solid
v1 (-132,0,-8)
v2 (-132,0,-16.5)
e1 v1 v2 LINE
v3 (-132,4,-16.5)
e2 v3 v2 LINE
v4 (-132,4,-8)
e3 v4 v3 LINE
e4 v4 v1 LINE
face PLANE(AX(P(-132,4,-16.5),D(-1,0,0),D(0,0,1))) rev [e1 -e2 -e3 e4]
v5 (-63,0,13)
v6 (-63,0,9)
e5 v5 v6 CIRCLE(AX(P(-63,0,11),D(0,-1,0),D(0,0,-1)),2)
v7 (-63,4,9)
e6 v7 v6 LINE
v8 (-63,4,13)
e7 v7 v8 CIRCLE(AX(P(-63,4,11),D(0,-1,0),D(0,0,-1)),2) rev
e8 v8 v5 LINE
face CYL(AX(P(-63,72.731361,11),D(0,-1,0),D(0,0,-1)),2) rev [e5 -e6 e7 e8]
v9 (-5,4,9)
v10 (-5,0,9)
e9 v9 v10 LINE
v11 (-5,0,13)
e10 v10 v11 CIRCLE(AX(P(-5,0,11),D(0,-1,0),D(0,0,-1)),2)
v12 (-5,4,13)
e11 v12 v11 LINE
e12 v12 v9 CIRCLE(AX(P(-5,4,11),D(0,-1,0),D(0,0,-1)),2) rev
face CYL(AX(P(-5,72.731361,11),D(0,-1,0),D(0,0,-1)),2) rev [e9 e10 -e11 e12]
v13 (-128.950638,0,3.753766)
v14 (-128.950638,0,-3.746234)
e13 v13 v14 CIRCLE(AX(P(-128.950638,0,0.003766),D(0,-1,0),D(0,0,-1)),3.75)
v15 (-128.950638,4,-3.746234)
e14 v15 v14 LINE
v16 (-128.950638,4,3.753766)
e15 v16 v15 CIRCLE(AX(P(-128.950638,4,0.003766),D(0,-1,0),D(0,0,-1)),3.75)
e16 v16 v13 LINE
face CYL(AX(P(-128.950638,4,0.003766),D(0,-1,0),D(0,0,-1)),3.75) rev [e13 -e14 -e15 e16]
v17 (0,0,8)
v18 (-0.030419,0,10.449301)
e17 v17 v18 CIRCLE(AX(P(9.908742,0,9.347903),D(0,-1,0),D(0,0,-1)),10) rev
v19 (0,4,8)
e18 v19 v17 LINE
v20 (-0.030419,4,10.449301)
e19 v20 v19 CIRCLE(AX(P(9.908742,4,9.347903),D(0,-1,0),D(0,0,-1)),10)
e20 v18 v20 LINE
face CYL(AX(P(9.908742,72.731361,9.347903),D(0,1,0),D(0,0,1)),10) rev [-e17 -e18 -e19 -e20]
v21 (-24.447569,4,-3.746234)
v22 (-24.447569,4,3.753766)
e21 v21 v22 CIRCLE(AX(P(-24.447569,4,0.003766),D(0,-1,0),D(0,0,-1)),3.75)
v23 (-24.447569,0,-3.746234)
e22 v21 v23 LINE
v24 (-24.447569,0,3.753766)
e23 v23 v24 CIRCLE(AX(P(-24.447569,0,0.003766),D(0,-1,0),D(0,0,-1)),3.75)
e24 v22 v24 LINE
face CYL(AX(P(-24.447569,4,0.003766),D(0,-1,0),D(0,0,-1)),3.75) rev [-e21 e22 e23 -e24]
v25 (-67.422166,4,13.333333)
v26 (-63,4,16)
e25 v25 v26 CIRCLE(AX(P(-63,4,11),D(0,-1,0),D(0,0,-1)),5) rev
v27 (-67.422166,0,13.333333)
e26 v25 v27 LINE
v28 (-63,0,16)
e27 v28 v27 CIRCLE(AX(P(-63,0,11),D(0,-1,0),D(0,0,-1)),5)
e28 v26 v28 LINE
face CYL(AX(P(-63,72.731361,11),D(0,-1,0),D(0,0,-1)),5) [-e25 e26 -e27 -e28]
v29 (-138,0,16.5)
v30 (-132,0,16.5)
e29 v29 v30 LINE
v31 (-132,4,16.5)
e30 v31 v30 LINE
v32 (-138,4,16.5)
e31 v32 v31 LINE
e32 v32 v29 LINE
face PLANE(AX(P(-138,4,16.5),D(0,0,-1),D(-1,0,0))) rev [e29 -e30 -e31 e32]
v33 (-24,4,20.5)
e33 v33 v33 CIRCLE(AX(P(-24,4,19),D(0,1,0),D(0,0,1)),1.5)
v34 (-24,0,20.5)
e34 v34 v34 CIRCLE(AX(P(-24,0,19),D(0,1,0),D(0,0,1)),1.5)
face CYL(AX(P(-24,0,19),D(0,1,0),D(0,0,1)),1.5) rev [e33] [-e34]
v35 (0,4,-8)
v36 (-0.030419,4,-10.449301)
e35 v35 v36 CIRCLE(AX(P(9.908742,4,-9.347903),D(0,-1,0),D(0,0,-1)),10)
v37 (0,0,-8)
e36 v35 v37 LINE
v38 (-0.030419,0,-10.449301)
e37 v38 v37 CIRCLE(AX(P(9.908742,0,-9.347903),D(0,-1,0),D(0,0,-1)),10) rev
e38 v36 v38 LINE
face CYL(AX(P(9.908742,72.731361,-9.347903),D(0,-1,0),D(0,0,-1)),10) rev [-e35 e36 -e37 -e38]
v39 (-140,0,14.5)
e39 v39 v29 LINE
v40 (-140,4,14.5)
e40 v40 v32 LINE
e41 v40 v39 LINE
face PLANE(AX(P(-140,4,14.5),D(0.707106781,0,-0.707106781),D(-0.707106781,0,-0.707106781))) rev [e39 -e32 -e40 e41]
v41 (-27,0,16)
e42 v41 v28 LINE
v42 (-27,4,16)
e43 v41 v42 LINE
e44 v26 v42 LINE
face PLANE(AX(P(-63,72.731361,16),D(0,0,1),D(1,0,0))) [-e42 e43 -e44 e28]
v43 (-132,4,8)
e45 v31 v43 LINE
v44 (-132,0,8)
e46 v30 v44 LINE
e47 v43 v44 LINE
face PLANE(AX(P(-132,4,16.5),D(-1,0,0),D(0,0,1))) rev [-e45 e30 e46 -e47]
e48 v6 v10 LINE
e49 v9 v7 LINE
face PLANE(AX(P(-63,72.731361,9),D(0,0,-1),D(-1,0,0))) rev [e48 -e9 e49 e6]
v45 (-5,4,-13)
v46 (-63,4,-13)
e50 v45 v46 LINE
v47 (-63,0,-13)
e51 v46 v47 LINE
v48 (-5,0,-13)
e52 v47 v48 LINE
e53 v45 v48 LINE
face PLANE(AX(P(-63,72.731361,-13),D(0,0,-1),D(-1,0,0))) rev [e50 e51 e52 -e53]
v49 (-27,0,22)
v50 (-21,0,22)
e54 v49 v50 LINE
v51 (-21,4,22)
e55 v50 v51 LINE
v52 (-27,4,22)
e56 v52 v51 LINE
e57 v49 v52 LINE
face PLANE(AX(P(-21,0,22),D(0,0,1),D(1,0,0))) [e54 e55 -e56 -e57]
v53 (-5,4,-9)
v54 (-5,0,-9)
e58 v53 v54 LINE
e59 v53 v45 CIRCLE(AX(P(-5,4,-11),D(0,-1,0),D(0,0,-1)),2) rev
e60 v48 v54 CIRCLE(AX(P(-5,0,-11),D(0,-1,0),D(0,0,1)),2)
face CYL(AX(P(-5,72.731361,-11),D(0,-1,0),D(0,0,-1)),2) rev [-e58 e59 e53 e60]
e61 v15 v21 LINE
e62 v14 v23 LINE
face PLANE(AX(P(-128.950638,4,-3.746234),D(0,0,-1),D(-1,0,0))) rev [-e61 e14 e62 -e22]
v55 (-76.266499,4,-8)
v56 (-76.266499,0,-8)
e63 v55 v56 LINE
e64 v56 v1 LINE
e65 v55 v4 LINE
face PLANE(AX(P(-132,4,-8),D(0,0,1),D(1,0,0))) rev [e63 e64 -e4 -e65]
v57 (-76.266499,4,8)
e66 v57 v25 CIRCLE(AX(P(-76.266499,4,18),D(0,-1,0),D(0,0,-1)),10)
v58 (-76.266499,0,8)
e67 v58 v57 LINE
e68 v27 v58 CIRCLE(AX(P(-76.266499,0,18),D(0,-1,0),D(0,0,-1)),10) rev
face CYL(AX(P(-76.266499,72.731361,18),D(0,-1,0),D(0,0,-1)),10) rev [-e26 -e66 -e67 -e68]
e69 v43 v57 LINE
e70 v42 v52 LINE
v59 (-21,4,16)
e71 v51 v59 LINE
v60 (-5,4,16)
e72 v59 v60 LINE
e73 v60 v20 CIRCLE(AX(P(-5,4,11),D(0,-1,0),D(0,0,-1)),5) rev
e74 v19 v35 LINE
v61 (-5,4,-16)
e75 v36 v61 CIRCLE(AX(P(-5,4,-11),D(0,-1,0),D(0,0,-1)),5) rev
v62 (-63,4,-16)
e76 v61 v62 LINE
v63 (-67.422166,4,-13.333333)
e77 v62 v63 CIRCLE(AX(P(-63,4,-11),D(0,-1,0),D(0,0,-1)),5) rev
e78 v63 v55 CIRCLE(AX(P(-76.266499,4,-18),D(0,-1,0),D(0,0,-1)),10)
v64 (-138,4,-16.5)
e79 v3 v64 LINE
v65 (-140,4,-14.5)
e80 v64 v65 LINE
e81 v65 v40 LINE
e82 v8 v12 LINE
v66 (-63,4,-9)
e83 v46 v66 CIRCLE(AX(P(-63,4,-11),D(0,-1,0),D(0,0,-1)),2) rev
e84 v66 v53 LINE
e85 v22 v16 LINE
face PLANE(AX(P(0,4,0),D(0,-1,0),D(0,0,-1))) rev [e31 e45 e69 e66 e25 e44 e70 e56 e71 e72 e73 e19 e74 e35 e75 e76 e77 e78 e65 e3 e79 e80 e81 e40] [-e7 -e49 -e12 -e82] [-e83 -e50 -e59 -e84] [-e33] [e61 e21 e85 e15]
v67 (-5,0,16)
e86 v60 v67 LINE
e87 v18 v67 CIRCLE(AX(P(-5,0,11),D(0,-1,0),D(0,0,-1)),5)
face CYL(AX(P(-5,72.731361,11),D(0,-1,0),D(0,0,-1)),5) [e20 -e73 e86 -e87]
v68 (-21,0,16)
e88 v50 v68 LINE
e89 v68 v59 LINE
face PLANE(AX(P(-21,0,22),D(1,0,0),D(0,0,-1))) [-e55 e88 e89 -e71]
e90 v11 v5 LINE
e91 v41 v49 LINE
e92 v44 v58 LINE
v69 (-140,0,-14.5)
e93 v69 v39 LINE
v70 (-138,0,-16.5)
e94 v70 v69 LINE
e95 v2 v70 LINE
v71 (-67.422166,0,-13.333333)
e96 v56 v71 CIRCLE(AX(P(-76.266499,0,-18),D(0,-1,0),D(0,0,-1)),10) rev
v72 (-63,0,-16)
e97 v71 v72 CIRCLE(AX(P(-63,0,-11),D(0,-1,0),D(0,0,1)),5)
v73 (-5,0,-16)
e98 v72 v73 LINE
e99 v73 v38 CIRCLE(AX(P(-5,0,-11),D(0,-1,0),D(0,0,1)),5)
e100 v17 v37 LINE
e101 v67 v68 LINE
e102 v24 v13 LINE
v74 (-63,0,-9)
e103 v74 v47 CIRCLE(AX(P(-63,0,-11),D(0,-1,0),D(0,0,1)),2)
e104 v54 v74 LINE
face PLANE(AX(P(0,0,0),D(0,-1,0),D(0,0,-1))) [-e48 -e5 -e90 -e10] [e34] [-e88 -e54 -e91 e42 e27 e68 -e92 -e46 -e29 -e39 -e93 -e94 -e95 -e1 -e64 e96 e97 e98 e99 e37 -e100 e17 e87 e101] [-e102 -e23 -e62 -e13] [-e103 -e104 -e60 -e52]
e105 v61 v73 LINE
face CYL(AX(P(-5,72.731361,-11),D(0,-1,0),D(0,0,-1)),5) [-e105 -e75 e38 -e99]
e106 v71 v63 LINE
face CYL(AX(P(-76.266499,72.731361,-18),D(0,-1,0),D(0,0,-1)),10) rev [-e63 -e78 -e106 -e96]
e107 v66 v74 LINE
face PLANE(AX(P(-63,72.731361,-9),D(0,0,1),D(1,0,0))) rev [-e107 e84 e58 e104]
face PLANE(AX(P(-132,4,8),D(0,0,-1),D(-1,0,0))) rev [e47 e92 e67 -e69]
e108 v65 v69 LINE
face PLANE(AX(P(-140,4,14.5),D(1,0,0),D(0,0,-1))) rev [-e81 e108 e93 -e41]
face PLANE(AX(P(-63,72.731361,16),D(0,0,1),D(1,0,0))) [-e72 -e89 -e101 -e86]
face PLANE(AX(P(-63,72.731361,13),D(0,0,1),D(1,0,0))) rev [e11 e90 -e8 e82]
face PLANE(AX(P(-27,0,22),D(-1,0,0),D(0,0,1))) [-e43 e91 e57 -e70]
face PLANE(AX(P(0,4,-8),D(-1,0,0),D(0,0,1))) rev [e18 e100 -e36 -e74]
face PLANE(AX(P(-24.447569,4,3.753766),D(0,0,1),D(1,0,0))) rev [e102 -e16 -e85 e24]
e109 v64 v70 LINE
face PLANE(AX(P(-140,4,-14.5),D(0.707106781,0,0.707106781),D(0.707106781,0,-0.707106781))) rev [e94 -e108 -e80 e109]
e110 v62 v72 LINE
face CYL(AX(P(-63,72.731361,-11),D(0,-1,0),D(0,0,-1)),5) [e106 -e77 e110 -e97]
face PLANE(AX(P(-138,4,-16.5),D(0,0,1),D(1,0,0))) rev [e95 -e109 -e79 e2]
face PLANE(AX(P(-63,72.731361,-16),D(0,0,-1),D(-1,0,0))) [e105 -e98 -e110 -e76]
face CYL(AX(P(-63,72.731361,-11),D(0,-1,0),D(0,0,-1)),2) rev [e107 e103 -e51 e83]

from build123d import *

# Parameters (mm, degrees)
EXTRUDE_1_DEPTH     = 4
EXTRUDE_2_DEPTH     = 4
FILLET_1_R          = 10
CUT_EXTRUDE_1_DEPTH = 142.025706876
SKETCH_4_W          = 6
SKETCH_4_H          = 6
EXTRUDE_7_DEPTH     = 4
SKETCH_6_R          = 1.5
CUT_EXTRUDE_4_DEPTH = 142.774468788


with BuildPart() as part:
    # Эскиз1 → Бобышка-Вытянуть1 (new body)
    with BuildSketch(Plane(origin=(0, 0, 0), x_dir=(1, 0, 0), z_dir=(0, 1, 0))):
        Polygon((-140, -14.5), (-140, 14.5), (-138, 16.5), (-132, 16.5), (-132, 8), (0, 8), (0, -8), (-132, -8), (-132, -16.5), (-138, -16.5), align=None)
    extrude(amount=EXTRUDE_1_DEPTH)

    # Эскиз2 → Бобышка-Вытянуть2 (add)
    # profile 1 of 2: a face of its own
    with BuildSketch(Plane.XZ):
        with BuildLine():
            Line((-63, 16), (-5, 16))
            ThreePointArc((-5, 16), (0, 11), (-5, 6))
            Line((-5, 6), (-63, 6))
            ThreePointArc((-63, 6), (-68, 11), (-63, 16))
        make_face()
        with BuildLine():
            Line((-63, 13), (-5, 13))
            ThreePointArc((-5, 13), (-3, 11), (-5, 9))
            Line((-5, 9), (-63, 9))
            ThreePointArc((-63, 9), (-65, 11), (-63, 13))
        make_face(mode=Mode.SUBTRACT)
    # profile 2 of 2: a face of its own
    with BuildSketch(Plane.XZ):
        with BuildLine():
            Line((-63, -16), (-5, -16))
            ThreePointArc((-5, -16), (0, -11), (-5, -6))
            Line((-5, -6), (-63, -6))
            ThreePointArc((-63, -6), (-68, -11), (-63, -16))
        make_face()
        with BuildLine():
            Line((-63, -13), (-5, -13))
            ThreePointArc((-5, -13), (-3, -11), (-5, -9))
            Line((-5, -9), (-63, -9))
            ThreePointArc((-63, -9), (-65, -11), (-63, -13))
        make_face(mode=Mode.SUBTRACT)
    extrude(amount=-EXTRUDE_2_DEPTH)

    # Скругление1
    # the kernel refuses this fillet: 10 mm, written as the material it adds along each edge
    with BuildSketch(Plane(origin=(-1, 4, 8), x_dir=(1, 0, 0), z_dir=(0, -1, 0))) as fillet_1_piece_1:
        with BuildLine():
            CenterArc((10.90874153, 1.347902551), FILLET_1_R, 173.676623786, 14.069867748)
            Line((0.96958051, 2.44930085), (0.77079729, 2.471328816))
            ThreePointArc((0.77079729, 2.471328816), (0.463030841, 1.233264109), (-0.16, 0.12))
            Line((-0.16, 0.12), (0, -0.2))
            ThreePointArc((0, -0.2), (0.5, -0.2), (0.801825169, -0.026958051))
            Line((0.801825169, -0.026958051), (1, 0))
        make_face()
    extrude(amount=4)
    with BuildSketch(Plane(origin=(-67, 4, 8), x_dir=(-1, 0, 0), z_dir=(0, -1, 0))) as fillet_1_piece_2:
        with BuildLine():
            CenterArc((9.266499161, -10), FILLET_1_R, 90, 62.181860715)
            Line((0.422166387, -5.333333333), (0.245279732, -5.24))
            ThreePointArc((0.245279732, -5.24), (0.785032611, -2.621235013), (-0.16, -0.12))
            Line((-0.16, -0.12), (0, 0.2))
            Line((0, 0.2), (9.266499161, 0.2))
            Line((9.266499161, 0.2), (9.266499161, 0))
        make_face()
    extrude(amount=4)
    with BuildSketch(Plane(origin=(-1, 4, -8), x_dir=(1, 0, 0), z_dir=(0, -1, 0))) as fillet_1_piece_3:
        with BuildLine():
            CenterArc((10.90874153, -1.347902551), FILLET_1_R, 172.253508466, 14.069867748)
            Line((0.96958051, -2.44930085), (0.77079729, -2.471328816))
            ThreePointArc((0.77079729, -2.471328816), (0.463030841, -1.233264109), (-0.16, -0.12))
            Line((-0.16, -0.12), (0, 0.2))
            ThreePointArc((0, 0.2), (0.5, 0.2), (0.801825169, 0.026958051))
            Line((0.801825169, 0.026958051), (1, 0))
        make_face()
    extrude(amount=4)
    with BuildSketch(Plane(origin=(-67, 4, -8), x_dir=(-1, 0, 0), z_dir=(0, -1, 0))) as fillet_1_piece_4:
        with BuildLine():
            CenterArc((9.266499161, 10), FILLET_1_R, 207.818139285, 62.181860715)
            Line((0.422166387, 5.333333333), (0.245279732, 5.24))
            ThreePointArc((0.245279732, 5.24), (0.785032611, 2.621235013), (-0.16, 0.12))
            Line((-0.16, 0.12), (0, -0.2))
            Line((0, -0.2), (9.266499161, -0.2))
            Line((9.266499161, -0.2), (9.266499161, 0))
        make_face()
    extrude(amount=4)

    # Эскиз3 → Вырез-Вытянуть1 (cut, through all)
    with BuildSketch(Plane.XZ):
        with BuildLine():
            Line((-24.447568559, 3.753765504), (-128.9506377, 3.753765504))
            ThreePointArc((-128.9506377, 3.753765504), (-132.7006377, 0.003765504), (-128.9506377, -3.746234496))
            Line((-128.9506377, -3.746234496), (-24.447568559, -3.746234496))
            ThreePointArc((-24.447568559, -3.746234496), (-20.697568559, 0.003765504), (-24.447568559, 3.753765504))
        make_face()
    extrude(amount=-CUT_EXTRUDE_1_DEPTH, mode=Mode.SUBTRACT)

    # Эскиз4 → Бобышка-Вытянуть7 (add)
    with BuildSketch(Plane(origin=(0, 4, 0), x_dir=(1, 0, 0), z_dir=(0, 1, 0))):
        with Locations((-24, -19)):
            Rectangle(SKETCH_4_W, SKETCH_4_H)
    extrude(amount=-EXTRUDE_7_DEPTH)

    # Эскиз6 → Вырез-Вытянуть4 (cut, through all)
    with BuildSketch(Plane(origin=(0, 4, 0), x_dir=(1, 0, 0), z_dir=(0, 1, 0))):
        with Locations(Location((-24, -19, 0), (0, 0, 270))):
            Circle(SKETCH_6_R)
    extrude(amount=-CUT_EXTRUDE_4_DEPTH, mode=Mode.SUBTRACT)


solid = part.part
